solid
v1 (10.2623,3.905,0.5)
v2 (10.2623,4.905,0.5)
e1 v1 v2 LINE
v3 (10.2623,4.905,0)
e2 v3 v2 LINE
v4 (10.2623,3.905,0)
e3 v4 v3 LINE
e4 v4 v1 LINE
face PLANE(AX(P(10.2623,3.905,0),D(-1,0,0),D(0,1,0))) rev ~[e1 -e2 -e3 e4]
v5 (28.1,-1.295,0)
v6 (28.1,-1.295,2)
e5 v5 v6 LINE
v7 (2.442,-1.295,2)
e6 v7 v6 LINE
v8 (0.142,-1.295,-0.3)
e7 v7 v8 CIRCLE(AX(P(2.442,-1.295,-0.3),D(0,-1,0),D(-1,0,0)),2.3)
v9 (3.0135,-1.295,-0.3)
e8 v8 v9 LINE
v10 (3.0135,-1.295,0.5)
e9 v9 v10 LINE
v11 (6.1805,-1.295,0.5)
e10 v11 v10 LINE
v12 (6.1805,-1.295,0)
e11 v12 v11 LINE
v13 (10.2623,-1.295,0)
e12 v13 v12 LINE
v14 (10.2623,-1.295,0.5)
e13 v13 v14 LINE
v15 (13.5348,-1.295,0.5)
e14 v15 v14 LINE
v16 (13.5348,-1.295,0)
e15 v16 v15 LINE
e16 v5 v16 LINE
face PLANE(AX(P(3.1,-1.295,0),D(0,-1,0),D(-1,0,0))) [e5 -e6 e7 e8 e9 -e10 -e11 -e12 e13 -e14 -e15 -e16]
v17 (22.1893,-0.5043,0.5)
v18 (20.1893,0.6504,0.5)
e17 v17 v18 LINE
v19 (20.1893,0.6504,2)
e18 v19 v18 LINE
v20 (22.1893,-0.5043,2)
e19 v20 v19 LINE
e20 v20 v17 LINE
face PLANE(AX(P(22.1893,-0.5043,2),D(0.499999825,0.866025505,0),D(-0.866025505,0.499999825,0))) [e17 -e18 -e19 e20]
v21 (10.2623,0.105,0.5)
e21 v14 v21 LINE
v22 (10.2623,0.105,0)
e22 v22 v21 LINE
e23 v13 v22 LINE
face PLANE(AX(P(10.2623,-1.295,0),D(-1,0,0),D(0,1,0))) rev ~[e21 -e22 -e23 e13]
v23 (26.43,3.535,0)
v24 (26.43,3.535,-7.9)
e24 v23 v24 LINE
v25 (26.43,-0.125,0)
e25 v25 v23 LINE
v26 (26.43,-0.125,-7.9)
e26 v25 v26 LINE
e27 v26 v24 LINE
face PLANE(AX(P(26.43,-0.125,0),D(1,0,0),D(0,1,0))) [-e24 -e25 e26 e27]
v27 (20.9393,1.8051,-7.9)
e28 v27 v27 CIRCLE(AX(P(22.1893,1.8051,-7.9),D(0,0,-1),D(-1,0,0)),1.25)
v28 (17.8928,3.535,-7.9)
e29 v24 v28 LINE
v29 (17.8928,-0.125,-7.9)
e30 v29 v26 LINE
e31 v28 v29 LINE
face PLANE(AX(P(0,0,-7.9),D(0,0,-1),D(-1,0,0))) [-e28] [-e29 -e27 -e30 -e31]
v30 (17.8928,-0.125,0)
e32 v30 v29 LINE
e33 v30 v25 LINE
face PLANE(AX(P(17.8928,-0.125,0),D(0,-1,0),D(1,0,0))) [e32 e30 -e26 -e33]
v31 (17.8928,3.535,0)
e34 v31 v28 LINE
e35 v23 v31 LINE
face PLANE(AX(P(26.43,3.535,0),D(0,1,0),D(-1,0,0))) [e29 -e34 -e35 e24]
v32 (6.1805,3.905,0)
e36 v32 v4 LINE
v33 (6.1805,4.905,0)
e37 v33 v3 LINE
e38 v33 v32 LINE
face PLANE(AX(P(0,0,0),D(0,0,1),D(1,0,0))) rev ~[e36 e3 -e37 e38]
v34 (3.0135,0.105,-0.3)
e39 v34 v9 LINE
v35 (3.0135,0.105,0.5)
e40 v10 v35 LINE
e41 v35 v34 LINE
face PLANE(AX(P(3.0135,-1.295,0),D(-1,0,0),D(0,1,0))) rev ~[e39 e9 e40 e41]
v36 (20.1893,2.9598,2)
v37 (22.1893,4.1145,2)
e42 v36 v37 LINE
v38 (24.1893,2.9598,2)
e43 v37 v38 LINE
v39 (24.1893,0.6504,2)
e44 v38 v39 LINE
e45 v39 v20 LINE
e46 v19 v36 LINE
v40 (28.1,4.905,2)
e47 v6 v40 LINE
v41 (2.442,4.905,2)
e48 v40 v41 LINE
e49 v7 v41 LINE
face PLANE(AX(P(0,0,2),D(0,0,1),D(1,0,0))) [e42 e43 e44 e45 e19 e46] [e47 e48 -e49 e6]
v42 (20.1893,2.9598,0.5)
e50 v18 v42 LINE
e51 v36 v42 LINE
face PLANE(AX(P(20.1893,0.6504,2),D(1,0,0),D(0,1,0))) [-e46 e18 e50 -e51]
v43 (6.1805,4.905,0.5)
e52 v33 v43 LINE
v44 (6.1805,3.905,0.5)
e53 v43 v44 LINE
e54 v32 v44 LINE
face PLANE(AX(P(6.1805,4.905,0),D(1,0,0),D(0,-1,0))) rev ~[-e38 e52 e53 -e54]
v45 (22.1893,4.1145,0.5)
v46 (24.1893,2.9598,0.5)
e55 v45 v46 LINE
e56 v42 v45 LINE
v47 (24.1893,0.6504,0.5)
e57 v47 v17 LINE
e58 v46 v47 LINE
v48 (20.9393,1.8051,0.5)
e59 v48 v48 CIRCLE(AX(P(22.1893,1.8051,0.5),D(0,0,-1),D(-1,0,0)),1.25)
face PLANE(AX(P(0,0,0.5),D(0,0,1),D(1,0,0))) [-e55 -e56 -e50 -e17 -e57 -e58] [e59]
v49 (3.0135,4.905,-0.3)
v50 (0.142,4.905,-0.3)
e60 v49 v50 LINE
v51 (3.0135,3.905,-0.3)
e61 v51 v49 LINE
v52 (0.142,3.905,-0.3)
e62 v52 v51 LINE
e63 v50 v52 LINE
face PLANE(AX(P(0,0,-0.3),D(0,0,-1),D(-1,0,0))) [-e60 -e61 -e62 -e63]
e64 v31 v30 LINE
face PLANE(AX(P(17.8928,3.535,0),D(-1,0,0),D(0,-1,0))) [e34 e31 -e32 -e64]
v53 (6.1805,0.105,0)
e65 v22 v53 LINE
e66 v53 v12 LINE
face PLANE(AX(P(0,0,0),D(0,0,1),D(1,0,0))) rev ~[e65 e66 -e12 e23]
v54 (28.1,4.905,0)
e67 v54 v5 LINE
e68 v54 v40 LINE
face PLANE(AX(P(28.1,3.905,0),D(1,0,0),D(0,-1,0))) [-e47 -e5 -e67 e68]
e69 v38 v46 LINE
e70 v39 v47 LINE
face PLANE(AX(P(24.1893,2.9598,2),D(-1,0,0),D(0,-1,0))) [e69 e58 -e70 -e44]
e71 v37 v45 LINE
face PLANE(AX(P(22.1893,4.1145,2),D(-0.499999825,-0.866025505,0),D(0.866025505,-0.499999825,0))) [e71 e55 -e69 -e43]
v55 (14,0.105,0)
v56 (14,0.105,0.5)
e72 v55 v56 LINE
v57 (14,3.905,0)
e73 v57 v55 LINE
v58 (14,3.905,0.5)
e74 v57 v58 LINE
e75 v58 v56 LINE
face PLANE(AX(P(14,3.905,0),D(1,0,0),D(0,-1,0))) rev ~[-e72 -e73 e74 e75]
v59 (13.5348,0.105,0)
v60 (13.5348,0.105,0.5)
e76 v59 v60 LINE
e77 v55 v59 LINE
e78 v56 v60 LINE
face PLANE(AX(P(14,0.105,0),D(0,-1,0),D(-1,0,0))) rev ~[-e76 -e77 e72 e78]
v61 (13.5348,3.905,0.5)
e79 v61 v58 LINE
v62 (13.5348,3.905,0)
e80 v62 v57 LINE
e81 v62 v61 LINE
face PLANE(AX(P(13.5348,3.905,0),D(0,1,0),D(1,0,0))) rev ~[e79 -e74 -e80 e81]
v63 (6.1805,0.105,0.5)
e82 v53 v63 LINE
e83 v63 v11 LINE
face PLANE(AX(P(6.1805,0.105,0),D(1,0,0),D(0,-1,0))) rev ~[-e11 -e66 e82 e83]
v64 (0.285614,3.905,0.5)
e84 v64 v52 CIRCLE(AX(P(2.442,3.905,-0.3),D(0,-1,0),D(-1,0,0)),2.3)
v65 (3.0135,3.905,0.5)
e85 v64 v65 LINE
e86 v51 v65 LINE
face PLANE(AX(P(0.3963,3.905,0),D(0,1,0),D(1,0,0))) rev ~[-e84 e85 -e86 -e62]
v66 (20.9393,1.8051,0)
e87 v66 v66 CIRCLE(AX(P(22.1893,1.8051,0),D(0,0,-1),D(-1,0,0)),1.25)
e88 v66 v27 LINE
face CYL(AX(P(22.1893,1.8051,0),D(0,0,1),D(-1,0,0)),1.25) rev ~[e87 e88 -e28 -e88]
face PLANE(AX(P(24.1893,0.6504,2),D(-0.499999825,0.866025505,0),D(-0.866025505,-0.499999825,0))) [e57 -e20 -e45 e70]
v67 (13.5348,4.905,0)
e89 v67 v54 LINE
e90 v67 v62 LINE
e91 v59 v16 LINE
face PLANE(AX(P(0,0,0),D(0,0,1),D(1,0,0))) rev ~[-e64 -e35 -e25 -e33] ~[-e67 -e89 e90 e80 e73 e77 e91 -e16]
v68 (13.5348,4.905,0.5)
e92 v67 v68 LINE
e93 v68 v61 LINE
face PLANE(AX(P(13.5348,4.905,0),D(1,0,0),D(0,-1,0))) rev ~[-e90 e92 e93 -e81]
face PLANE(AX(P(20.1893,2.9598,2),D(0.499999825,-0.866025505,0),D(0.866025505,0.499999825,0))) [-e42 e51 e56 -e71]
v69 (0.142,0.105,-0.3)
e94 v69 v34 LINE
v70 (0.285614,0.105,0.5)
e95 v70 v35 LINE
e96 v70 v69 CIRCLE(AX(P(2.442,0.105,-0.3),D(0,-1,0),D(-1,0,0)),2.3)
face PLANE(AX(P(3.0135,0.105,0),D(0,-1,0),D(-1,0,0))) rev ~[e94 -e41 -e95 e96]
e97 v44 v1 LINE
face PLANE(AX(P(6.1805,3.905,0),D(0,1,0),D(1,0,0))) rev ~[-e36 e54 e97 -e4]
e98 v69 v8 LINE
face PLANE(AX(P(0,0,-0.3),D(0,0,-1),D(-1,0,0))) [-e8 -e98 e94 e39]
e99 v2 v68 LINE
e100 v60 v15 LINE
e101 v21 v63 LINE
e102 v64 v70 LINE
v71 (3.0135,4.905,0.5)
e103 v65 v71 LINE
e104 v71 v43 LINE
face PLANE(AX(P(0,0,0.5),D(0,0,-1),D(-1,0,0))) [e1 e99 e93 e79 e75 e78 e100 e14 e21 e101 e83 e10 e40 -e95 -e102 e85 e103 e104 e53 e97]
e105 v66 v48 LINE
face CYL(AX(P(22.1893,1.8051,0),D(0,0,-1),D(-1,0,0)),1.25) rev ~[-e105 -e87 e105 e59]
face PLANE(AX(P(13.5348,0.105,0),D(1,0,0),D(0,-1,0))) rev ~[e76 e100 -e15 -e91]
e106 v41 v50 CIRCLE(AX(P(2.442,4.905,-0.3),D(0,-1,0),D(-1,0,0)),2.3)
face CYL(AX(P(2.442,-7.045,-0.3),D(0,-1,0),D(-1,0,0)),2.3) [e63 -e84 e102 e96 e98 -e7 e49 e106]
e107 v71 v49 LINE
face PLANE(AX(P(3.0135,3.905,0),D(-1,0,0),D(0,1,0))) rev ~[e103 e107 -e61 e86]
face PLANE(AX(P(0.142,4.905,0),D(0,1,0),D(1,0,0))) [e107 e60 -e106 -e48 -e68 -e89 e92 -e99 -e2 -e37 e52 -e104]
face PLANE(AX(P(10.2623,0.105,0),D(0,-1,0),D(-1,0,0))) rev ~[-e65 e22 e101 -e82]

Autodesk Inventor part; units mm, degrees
ref_plane "YZ Plane" through (0, 0, 0) normal (1, 0, 0) x (0, 1, 0)
ref_plane "XZ Plane" through (0, 0, 0) normal (0, 1, 0) x (-1, 0, 0)
ref_plane "XY Plane" through (0, 0, 0) normal (0, 0, 1) x (1, 0, 0)
sketch "Sketch1" plane through (0, 0, 0) normal (0, 0, 1) x (1, 0, 0)
  line L0 (0.142, 0.105) -> (28.1, 0.105)
  line L1 (28.1, -1.295) -> (0.142, -1.295)
  line L2 (0.142, -1.295) -> (0.142, 0.105)
  line L3 (28.1, -1.295) -> (28.1, 0.105)
  line L4 (0.142, -1.295) -> (0.142, 0.105)
  line L5 (10.2623, 4.905) -> (13.5348, 4.905) projected
  line L6 (6.1805, 3.905) -> (10.2623, 3.905) projected
  line L7 (10.2623, 0.105) -> (6.1805, 0.105) projected
  line L8 (0.142, 4.905) -> (28.1, 4.905)
  line L9 (28.1, 4.905) -> (28.1, 3.905)
  line L10 (28.1, 3.905) -> (0.142, 3.905)
  line L11 (0.142, 3.905) -> (0.142, 4.905)
  line L12 (0.142, -1.295) -> (0.142, 0.105)
  line L13 (28.1, 3.905) -> (28.1, 0.105)
  line L14 (0.142, 3.905) -> (0.142, 0.105)
  line L15 (3.1, -1.295) -> (29.6, -1.295) projected
  line L16 (0.142, -1.295) -> (0.142, 0.105) projected
extrude "side" add sketch "Sketch1" along normal blind 2
sketch "Sketch2" plane through (0, 0, 0) normal (0, 0, -1) x (-1, 0, 0)
  line L0 (-26.6, -0.295) -> (-17.7228, -0.295) projected
  circle A0 centre (-22.1893, 1.8051) radius 1.1 projected
  line L1 (-26.6, -0.295) -> (-17.7228, -0.295) projected
  line L2 (-26.6, 3.705) -> (-26.6, -0.295) projected
  line L3 (-17.7228, 3.705) -> (-26.6, 3.705) projected
  line L4 (-17.8928, -0.125) -> (-26.43, -0.125)
  line L5 (-26.43, -0.125) -> (-26.43, 3.535)
  line L6 (-26.43, 3.535) -> (-17.8928, 3.535)
  circle A1 centre (-22.1893, 1.8051) radius 1.25
  line L7 (-17.8928, 3.535) -> (-17.8928, -0.125)
  line L8 (-17.7228, -0.295) -> (-17.7228, 3.905) projected
  point P0 (0, 0)
  dimension "d2" = 0.17
  dimension "d4" = 0.17
  dimension "d5" = 0.17
  dimension "d6" = 2.5
  dimension "d25" = 0.17
extrude "sliding_block" add sketch "Sketch2" along normal blind 7.9 contours L4 L5 L6 L7
sketch "Sketch3" plane through (22.1893, 1.8051, 0) normal (0, 0, -1) x (-1, 0, 0)
  circle A0 centre (0, 0) radius 1.25 projected
  point P0 (22.1893, -1.8051)
extrude "hole" cut sketch "Sketch3" against normal up to surface (2 mm away)
sketch "Sketch4" plane through (0, 0, 0) normal (0, 0, -1) x (-1, 0, 0)
  line L0 (-3.0135, 4.905) -> (-6.1805, 4.905) projected
  line L1 (-3.0135, 3.905) -> (-3.0135, 4.905) projected
  line L2 (-0.3963, 3.905) -> (-3.0135, 3.905) projected
  line L3 (-3.0135, 0.105) -> (-0.3963, 0.105) projected
  line L4 (-3.0135, -1.295) -> (-3.0135, 0.105) projected
  line L5 (-6.1805, -1.295) -> (-3.0135, -1.295) projected
  line L6 (-6.1805, 0.105) -> (-6.1805, -1.295) projected
  line L7 (-10.2623, 0.105) -> (-6.1805, 0.105) projected
  line L8 (-10.2623, -1.295) -> (-10.2623, 0.105) projected
  line L9 (-13.5348, -1.295) -> (-10.2623, -1.295) projected
  line L10 (-13.5348, 0.105) -> (-13.5348, -1.295) projected
  line L11 (-14, 0.105) -> (-13.5348, 0.105) projected
  line L12 (-14, 3.905) -> (-14, 0.105) projected
  line L13 (-13.5348, 3.905) -> (-14, 3.905) projected
  line L14 (-13.5348, 4.905) -> (-13.5348, 3.905) projected
  line L15 (-10.2623, 4.905) -> (-13.5348, 4.905) projected
  line L16 (-10.2623, 3.905) -> (-10.2623, 4.905) projected
  line L17 (-6.1805, 3.905) -> (-10.2623, 3.905) projected
  line L18 (-6.1805, 4.905) -> (-6.1805, 3.905) projected
  line L19 (-6.1805, -1.295) -> (-3.0135, -1.295) projected
  line L20 (-6.1805, 0.105) -> (-6.1805, -1.295) projected
  line L21 (-10.2623, 0.105) -> (-6.1805, 0.105) projected
  line L22 (-10.2623, -1.295) -> (-10.2623, 0.105) projected
  line L23 (-13.5348, -1.295) -> (-10.2623, -1.295) projected
  line L24 (-13.5348, 0.105) -> (-13.5348, -1.295) projected
  line L25 (-14, 0.105) -> (-13.5348, 0.105) projected
  line L26 (-14, 3.905) -> (-14, 0.105) projected
  line L27 (-13.5348, 3.905) -> (-14, 3.905) projected
  line L28 (-13.5348, 4.905) -> (-13.5348, 3.905) projected
  line L29 (-10.2623, 4.905) -> (-13.5348, 4.905) projected
  line L30 (-10.2623, 3.905) -> (-10.2623, 4.905) projected
  line L31 (-6.1805, 3.905) -> (-10.2623, 3.905) projected
  line L32 (-6.1805, 4.905) -> (-6.1805, 3.905) projected
  line L33 (-3.0135, 4.905) -> (-6.1805, 4.905) projected
  line L34 (-3.0135, 3.905) -> (-3.0135, 4.905) projected
  line L35 (-0.3963, 3.905) -> (-3.0135, 3.905) projected
  line L36 (-0.3963, 0.105) -> (-0.3963, 3.905) projected
  line L37 (-3.0135, 0.105) -> (-0.3963, 0.105) projected
  line L38 (-3.0135, -1.295) -> (-3.0135, 0.105) projected
  line L39 (-0.3963, 0.105) -> (-0.142, 0.105)
  line L40 (-0.142, 4.905) -> (-0.142, -1.295) projected
  line L41 (-0.3963, 3.905) -> (-0.142, 3.905)
  line L42 (-0.142, 3.905) -> (-0.142, 0.105)
extrude "alignment_cut" cut sketch "Sketch4" against normal blind 0.5
sketch "Sketch5" plane through (0, 0, 2) normal (0, 0, 1) x (1, 0, 0)
  line L0 (22.1893, 4.1145) -> (24.1893, 2.9598)
  line L1 (24.1893, 2.9598) -> (24.1893, 0.6504)
  line L2 (24.1893, 0.6504) -> (22.1893, -0.5043)
  line L3 (22.1893, -0.5043) -> (20.1893, 0.6504)
  line L4 (20.1893, 0.6504) -> (20.1893, 2.9598)
  line L5 (20.1893, 2.9598) -> (22.1893, 4.1145)
  circle A0 centre (22.1893, 1.8051) radius 1.25 projected
  point P0 (0, 0)
  dimension "d19" = 4
sketch "Sketch6" plane through (0, 0, 0) normal (0, 0, -1) x (-1, 0, 0)
  line L0 (-0.142, -1.295) -> (-28.1, -1.295) projected
  line L1 (-0.142, -1.295) -> (-28.1, -1.295) projected
  line L2 (-28.1, 4.905) -> (-0.142, 4.905) projected
  line L3 (-28.1, 4.905) -> (-13.5348, 4.905) projected
  line L4 (-3.0135, 3.905) -> (-3.0135, 4.905) projected
  line L5 (-0.142, 4.905) -> (-3.0135, 4.905) projected
  line L6 (-0.142, 3.905) -> (-3.0135, 3.905) projected
  line L7 (-0.142, -1.295) -> (-3.0135, -1.295) projected
  line L8 (-13.5348, -1.295) -> (-13.5348, 0.105) projected
  line L9 (-13.5348, 0.105) -> (-14, 0.105) projected
  line L10 (-14, 0.105) -> (-14, 3.905) projected
  line L11 (-14, 3.905) -> (-13.5348, 3.905) projected
  line L12 (-13.5348, 3.905) -> (-13.5348, 4.905) projected
  line L13 (-13.5348, -1.295) -> (-28.1, -1.295) projected
  line L14 (-10.2623, 0.105) -> (-10.2623, -1.295) projected
  line L15 (-6.1805, -1.295) -> (-10.2623, -1.295) projected
  line L16 (-6.1805, -1.295) -> (-6.1805, 0.105) projected
  line L17 (-6.1805, 0.105) -> (-10.2623, 0.105) projected
  line L18 (-3.0135, 0.105) -> (-3.0135, -1.295) projected
  line L19 (-0.142, 4.905) -> (-0.142, 3.905) projected
  line L20 (-3.0135, 4.905) -> (-3.0135, 3.905) projected
  line L21 (-10.2623, 4.905) -> (-10.2623, 3.905) projected
  line L22 (-10.2623, 3.905) -> (-6.1805, 3.905) projected
  line L23 (-6.1805, 3.905) -> (-6.1805, 4.905) projected
  line L24 (-3.0135, 4.905) -> (-0.142, 4.905) projected
  line L25 (-10.2623, 4.905) -> (-6.1805, 4.905) projected
  line L26 (-28.1, -1.295) -> (-28.1, 4.905) projected
  line L27 (-26.43, 3.535) -> (-17.8928, 3.535) projected
  line L28 (-17.8928, 3.535) -> (-17.8928, -0.125) projected
  line L29 (-17.8928, -0.125) -> (-26.43, -0.125) projected
  line L30 (-26.43, -0.125) -> (-26.43, 3.535) projected
  line L31 (-0.142, 3.905) -> (-0.142, 4.905) projected
  line L32 (-0.142, 0.105) -> (-0.142, -1.295) projected
  line L33 (-0.142, 0.105) -> (-3.0135, 0.105) projected
  line L34 (-3.0135, 3.905) -> (-0.142, 3.905) projected
  point P0 (-0.1, 0.105)
  point P1 (-0.1, 3.905)
extrude "probe_slot" add sketch "Sketch6" along normal blind 0.3 contours L0 L18 L33 L32 | L2 L19 L6 L4
extrude "nut_slot" cut sketch "Sketch5" against normal blind 1.5 contours L0 L1 L2 L3 L4 L5 | A0
fillet "Fillet3" radius 2.3 1 edges at (0.142, 1.805, 2)
equation "\"d4\" = d2"
equation "\"d5\" = d2"
equation "\"d25\" = d2"
properties part number "stereotax_side"
